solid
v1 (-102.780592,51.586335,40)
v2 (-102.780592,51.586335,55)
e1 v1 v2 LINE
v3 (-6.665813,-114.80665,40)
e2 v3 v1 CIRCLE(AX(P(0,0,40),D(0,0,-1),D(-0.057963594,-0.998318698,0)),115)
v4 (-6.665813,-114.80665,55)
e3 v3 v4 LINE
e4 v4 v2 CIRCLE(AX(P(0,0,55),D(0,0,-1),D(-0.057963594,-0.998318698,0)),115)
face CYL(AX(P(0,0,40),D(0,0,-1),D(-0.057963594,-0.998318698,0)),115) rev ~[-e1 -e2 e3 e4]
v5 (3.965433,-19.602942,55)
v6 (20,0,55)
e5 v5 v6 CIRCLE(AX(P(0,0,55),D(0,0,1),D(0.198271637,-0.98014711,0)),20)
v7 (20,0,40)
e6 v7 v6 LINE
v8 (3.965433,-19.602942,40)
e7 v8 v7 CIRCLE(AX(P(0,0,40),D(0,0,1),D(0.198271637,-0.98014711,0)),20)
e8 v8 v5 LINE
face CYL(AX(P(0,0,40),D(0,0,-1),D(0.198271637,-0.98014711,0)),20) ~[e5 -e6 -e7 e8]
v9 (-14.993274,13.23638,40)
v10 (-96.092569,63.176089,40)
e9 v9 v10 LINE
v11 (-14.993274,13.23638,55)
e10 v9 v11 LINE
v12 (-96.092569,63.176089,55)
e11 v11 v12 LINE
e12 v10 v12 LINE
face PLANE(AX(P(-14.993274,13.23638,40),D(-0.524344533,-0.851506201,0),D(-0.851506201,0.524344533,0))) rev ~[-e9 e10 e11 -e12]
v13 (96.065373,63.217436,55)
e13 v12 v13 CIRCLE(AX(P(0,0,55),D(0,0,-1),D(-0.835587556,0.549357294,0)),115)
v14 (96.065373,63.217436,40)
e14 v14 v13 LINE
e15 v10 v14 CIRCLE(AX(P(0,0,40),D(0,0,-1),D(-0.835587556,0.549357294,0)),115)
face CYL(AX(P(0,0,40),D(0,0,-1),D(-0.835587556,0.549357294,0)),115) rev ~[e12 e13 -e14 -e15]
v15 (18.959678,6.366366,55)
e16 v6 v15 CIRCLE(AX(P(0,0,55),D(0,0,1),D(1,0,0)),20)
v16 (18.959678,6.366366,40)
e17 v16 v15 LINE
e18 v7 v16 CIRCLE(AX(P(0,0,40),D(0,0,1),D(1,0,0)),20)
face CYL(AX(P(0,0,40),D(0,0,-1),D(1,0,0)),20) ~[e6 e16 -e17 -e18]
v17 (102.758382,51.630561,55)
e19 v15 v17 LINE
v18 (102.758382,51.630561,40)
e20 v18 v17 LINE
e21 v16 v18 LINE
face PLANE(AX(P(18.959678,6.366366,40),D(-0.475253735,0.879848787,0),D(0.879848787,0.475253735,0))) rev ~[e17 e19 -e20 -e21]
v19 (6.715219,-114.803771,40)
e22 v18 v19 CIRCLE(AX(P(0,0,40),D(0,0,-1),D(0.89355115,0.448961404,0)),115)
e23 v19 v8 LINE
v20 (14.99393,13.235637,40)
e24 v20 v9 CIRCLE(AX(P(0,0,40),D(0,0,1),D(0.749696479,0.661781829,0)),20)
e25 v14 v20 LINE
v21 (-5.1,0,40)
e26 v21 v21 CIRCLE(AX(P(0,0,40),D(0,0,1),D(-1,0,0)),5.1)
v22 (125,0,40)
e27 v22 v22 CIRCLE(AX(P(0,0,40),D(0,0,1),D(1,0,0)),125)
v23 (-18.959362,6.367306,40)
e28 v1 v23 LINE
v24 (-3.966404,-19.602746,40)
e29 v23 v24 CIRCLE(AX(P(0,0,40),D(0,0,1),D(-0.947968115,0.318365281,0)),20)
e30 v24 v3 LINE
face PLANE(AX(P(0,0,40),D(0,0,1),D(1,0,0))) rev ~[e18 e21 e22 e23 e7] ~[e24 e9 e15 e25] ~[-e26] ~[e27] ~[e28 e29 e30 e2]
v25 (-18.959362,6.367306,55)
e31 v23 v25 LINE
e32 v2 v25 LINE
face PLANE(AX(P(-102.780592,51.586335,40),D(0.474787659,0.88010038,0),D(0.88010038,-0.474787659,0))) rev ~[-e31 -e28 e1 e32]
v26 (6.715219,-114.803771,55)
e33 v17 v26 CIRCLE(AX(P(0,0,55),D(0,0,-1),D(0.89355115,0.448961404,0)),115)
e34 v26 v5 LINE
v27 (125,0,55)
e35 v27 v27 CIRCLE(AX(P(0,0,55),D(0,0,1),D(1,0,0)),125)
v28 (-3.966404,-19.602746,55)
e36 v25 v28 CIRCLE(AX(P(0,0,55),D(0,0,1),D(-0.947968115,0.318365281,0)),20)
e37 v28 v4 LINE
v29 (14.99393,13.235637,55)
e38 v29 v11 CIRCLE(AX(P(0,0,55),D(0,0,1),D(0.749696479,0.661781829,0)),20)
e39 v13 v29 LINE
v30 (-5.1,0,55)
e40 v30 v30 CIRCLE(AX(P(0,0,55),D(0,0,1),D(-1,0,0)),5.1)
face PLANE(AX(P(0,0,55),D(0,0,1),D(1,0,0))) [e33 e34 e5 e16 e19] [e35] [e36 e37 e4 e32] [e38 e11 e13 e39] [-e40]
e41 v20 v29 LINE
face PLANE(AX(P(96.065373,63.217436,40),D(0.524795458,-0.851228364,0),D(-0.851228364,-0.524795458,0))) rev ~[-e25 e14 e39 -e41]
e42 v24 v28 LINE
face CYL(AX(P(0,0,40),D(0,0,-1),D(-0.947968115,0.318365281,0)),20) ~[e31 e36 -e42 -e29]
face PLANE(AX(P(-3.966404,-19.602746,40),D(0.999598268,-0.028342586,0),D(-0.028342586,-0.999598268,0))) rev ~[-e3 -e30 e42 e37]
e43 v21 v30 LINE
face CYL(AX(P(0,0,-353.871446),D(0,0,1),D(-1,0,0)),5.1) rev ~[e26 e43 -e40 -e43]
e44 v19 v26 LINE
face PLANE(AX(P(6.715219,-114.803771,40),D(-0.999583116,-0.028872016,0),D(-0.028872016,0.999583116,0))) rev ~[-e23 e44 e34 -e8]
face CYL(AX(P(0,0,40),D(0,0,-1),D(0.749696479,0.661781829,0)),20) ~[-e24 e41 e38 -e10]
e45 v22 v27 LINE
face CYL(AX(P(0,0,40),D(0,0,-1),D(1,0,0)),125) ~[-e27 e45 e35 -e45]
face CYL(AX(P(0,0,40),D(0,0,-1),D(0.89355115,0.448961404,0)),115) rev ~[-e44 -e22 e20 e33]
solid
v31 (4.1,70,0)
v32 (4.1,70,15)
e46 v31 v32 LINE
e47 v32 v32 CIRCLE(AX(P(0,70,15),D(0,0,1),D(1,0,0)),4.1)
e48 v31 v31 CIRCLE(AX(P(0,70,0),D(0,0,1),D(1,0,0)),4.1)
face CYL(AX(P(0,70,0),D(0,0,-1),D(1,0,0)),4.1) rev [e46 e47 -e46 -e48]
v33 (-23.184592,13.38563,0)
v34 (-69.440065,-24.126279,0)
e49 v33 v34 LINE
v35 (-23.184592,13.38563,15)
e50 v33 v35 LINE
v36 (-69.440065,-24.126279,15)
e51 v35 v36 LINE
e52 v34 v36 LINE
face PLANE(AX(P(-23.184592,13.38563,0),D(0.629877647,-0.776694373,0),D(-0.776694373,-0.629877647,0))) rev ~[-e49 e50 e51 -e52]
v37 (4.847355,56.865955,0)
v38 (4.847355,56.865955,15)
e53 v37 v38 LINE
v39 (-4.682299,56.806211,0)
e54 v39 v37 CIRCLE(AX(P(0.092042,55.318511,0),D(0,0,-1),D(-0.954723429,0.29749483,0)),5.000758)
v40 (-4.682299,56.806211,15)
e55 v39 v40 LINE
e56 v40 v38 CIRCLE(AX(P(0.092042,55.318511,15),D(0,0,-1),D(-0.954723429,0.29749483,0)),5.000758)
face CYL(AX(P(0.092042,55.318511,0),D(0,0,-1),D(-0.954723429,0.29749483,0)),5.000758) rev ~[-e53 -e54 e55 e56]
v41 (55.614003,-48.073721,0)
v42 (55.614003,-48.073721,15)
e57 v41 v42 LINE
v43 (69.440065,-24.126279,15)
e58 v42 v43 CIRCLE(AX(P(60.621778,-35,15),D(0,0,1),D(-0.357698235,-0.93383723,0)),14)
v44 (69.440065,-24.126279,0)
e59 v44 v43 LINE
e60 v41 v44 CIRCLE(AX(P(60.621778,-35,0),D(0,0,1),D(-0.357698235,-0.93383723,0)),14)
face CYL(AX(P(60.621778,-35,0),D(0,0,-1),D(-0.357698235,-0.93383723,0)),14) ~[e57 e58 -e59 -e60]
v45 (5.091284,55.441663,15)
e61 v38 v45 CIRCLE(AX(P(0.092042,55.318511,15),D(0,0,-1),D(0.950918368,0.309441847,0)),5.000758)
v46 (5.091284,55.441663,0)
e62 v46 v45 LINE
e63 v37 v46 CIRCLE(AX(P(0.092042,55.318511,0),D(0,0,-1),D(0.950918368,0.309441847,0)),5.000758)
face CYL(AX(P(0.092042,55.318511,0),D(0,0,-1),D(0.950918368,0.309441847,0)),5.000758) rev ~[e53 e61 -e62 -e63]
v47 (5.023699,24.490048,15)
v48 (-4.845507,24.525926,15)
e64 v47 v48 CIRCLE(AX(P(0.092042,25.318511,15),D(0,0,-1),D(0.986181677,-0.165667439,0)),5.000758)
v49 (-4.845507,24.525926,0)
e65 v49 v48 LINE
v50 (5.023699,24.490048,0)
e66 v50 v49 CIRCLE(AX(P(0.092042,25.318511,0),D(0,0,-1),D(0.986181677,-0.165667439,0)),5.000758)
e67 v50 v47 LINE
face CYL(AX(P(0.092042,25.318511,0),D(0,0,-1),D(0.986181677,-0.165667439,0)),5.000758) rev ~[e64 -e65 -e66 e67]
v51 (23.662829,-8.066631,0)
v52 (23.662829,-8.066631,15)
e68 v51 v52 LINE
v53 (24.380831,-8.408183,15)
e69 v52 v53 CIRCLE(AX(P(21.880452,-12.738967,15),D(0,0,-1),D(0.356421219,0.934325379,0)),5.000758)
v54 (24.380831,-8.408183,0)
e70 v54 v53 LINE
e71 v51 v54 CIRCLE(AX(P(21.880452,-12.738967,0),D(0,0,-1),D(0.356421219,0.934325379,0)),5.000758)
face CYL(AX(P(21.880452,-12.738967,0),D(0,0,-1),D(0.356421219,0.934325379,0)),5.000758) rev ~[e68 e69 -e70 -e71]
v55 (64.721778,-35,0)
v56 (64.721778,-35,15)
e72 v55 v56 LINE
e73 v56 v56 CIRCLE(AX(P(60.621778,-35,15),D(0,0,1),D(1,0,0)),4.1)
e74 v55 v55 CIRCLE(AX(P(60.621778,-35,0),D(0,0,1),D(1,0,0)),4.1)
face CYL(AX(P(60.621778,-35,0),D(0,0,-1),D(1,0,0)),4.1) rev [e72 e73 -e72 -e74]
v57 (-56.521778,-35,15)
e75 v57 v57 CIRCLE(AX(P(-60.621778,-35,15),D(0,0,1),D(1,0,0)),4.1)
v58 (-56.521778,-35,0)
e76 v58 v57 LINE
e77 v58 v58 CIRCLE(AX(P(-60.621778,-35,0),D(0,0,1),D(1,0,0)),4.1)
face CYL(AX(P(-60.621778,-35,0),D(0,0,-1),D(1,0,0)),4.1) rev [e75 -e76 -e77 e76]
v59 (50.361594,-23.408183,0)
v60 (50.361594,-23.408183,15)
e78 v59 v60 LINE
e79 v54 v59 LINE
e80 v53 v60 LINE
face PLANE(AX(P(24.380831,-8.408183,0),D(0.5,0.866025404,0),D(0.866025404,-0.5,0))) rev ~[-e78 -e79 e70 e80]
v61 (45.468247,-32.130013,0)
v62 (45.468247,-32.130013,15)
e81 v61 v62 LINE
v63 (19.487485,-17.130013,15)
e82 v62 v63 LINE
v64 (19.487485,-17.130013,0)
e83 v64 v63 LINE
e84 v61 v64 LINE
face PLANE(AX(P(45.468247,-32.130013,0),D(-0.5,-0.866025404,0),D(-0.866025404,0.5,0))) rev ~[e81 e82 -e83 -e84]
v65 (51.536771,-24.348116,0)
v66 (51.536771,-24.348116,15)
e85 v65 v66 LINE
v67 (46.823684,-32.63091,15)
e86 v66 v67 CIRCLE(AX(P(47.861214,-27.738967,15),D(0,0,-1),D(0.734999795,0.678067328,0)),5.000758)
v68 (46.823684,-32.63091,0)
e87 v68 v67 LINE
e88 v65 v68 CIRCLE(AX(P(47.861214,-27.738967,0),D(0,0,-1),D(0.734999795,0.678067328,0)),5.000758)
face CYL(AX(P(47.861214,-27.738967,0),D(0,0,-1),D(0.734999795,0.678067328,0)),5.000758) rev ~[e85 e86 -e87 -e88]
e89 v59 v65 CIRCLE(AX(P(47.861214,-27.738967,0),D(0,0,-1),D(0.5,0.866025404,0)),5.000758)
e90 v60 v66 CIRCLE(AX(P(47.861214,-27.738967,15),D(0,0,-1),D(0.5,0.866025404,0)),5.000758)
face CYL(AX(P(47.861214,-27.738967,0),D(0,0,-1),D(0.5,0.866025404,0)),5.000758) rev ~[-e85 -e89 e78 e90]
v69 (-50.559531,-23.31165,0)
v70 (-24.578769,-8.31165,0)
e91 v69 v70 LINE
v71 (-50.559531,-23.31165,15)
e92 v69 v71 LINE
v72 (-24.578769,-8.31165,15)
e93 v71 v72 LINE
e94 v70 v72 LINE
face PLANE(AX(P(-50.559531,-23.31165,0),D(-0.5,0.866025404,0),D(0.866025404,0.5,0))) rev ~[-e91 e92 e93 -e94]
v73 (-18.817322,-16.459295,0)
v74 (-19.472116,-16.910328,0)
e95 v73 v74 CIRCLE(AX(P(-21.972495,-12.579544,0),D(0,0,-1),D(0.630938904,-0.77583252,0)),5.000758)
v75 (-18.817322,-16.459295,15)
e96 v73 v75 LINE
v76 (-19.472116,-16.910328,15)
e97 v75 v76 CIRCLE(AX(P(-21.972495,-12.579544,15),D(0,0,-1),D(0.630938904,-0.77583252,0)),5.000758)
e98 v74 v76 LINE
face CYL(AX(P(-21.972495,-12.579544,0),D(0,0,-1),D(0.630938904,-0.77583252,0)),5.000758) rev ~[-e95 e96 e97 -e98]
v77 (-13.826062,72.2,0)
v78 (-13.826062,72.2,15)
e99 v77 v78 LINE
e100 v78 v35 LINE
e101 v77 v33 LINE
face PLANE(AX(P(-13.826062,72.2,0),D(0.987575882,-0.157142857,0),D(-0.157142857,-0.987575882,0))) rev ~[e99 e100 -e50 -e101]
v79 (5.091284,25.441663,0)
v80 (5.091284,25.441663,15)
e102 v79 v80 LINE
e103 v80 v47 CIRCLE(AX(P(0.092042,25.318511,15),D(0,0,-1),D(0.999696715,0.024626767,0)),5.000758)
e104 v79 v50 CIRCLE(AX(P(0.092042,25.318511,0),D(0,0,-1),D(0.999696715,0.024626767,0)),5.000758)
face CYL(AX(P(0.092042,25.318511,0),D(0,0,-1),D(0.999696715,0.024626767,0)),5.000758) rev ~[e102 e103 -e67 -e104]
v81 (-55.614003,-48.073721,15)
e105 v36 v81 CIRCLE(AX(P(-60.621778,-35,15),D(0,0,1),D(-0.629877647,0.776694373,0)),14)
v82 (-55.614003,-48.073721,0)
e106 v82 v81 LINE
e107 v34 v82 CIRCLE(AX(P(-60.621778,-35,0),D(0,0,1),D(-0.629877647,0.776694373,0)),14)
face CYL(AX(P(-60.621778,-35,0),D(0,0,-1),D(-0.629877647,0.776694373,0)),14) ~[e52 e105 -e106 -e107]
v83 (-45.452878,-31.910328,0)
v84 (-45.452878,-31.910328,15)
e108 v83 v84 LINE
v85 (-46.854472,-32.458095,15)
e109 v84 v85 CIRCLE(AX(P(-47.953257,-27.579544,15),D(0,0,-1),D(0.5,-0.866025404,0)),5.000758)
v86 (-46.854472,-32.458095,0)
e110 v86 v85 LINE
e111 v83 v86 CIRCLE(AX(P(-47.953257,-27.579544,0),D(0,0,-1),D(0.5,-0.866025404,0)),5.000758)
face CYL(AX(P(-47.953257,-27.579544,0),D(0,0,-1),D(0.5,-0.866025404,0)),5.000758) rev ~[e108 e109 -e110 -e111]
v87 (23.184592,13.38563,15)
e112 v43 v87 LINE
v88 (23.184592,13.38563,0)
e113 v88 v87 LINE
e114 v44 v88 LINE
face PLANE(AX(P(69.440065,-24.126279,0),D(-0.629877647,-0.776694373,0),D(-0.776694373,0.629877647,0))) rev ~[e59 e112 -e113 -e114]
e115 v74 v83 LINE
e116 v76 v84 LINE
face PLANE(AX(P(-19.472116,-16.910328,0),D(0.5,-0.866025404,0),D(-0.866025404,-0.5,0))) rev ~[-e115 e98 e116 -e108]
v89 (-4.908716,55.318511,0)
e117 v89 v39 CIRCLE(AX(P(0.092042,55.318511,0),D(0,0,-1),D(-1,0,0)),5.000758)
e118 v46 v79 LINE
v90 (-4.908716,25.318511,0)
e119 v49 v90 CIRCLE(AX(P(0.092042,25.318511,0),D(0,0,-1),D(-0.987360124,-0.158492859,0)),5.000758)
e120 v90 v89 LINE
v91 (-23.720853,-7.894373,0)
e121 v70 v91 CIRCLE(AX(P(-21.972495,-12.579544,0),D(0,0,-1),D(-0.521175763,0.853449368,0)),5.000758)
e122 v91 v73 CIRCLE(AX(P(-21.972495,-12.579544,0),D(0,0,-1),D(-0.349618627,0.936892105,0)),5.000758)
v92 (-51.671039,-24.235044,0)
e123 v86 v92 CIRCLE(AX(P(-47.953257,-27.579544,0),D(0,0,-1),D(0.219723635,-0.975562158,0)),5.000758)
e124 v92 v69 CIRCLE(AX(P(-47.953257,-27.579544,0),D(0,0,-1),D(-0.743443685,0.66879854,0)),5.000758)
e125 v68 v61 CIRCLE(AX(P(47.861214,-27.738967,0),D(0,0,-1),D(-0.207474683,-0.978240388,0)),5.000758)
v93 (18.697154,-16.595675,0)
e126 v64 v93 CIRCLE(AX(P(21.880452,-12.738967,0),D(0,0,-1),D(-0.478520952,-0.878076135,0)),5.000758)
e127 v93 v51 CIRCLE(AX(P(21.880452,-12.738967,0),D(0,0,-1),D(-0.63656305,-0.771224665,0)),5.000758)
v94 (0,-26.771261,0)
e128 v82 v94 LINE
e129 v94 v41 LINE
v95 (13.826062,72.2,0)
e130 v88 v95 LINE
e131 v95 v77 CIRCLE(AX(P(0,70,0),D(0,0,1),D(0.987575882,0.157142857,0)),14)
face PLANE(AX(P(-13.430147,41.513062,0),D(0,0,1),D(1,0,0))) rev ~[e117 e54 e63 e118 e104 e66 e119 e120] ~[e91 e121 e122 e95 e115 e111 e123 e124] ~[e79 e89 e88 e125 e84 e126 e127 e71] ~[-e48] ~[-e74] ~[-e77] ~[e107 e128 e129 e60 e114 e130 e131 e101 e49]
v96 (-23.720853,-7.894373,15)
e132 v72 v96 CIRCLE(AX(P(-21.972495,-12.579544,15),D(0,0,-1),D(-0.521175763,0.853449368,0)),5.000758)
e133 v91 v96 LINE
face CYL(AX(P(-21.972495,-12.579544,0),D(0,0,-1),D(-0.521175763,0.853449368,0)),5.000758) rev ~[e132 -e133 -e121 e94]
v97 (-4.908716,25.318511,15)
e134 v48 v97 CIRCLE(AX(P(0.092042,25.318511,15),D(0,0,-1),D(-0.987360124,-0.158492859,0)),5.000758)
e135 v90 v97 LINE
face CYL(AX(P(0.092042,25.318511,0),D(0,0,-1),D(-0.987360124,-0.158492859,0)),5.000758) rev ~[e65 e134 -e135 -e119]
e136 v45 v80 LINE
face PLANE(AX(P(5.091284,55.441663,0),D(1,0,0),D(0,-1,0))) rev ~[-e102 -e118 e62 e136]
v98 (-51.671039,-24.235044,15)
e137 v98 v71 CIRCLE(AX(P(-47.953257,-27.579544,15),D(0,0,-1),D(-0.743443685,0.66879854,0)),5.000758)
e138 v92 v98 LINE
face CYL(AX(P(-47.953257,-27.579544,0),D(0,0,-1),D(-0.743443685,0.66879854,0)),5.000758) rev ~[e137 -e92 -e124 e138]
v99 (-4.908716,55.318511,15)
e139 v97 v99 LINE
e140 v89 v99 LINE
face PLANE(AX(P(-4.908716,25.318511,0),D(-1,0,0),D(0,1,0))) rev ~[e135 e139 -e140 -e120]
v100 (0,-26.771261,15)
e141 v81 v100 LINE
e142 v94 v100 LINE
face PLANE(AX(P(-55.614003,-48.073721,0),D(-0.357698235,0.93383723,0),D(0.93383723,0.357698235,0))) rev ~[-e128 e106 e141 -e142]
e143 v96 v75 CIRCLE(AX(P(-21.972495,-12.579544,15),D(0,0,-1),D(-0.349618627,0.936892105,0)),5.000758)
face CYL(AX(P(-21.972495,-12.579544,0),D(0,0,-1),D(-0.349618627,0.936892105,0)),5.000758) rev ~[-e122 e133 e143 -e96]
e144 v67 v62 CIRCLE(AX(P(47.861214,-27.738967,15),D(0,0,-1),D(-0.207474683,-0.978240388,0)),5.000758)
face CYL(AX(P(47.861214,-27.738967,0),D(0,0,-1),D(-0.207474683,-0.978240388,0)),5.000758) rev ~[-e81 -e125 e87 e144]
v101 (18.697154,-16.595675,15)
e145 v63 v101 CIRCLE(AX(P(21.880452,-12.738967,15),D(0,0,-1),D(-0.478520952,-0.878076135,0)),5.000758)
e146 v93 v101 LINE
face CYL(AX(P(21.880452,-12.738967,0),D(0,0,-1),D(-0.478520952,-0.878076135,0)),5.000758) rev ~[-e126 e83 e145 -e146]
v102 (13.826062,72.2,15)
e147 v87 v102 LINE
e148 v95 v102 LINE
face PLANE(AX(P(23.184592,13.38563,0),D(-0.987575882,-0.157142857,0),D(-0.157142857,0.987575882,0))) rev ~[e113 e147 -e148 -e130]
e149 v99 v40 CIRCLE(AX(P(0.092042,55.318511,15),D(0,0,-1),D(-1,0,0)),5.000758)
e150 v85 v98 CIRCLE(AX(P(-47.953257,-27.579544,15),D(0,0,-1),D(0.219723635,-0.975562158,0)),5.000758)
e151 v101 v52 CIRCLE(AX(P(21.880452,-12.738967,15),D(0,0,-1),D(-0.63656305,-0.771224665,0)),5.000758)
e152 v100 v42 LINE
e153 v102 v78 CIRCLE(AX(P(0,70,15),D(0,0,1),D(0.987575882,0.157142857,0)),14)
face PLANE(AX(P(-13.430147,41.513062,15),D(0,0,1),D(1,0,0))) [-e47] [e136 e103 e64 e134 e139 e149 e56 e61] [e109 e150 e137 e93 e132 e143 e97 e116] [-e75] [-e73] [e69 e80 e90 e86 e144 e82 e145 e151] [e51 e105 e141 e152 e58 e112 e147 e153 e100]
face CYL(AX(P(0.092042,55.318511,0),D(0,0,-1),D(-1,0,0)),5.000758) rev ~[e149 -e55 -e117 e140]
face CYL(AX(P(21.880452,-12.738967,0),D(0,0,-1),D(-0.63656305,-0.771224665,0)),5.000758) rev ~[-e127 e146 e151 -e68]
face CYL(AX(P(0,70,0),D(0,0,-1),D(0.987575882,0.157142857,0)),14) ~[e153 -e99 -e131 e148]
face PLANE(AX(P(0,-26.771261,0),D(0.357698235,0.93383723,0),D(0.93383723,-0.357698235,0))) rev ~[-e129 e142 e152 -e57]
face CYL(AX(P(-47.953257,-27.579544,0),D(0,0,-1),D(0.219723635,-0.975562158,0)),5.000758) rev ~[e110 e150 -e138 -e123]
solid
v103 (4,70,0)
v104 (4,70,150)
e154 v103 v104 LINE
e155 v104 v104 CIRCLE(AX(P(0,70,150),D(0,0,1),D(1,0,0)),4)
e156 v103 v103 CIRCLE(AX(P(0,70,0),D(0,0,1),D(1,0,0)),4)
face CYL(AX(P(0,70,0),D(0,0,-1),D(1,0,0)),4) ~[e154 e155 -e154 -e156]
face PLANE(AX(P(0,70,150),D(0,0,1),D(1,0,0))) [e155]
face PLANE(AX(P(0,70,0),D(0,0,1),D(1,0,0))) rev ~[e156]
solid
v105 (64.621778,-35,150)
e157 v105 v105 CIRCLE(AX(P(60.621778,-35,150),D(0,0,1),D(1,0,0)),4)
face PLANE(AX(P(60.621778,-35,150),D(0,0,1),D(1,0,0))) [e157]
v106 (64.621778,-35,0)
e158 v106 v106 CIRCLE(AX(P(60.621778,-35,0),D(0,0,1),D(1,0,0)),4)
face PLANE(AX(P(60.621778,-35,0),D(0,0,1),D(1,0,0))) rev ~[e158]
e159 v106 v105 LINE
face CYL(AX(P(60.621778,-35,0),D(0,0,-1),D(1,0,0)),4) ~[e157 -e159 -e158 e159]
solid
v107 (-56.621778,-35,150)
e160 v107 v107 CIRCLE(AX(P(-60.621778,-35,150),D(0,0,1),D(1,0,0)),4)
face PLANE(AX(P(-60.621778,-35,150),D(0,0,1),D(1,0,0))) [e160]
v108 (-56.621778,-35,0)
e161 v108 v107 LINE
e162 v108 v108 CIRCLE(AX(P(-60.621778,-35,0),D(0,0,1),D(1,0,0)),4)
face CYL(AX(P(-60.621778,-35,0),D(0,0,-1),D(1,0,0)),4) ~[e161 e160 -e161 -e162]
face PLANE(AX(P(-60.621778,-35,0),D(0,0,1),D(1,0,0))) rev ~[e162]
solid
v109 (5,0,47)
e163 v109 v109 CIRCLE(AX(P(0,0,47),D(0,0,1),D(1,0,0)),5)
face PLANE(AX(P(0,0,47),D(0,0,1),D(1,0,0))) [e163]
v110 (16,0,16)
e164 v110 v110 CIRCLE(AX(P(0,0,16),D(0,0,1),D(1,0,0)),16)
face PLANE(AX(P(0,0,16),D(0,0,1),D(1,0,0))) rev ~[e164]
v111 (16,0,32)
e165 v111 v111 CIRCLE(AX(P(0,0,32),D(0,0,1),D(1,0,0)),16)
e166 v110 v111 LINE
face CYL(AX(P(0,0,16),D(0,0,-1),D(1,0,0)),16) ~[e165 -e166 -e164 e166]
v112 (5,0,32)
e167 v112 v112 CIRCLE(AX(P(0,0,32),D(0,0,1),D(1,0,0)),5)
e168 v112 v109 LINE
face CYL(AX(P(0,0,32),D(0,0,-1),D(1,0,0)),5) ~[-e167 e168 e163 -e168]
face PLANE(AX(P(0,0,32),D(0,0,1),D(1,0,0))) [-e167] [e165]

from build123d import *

# Parameters (mm, degrees)
F0_R      = 4
F1_DEPTH  = 150
F2_R      = 4.1
F3_DEPTH  = 15
F5_R      = 125
F6_DEPTH  = 15
F7_D      = 10.2
F9_R      = 16
F10_DEPTH = 16
F11_R     = 5
F12_DEPTH = 15


# Not quite as in the source:
# - a feature names something its author has since deleted; it is built from what else it names


with BuildPart() as f1:
    # F0 (on Top) → F1 (new body)
    with BuildSketch(Plane.XY):
        with Locations((0, 70)):
            Circle(F0_R)
    extrude(amount=F1_DEPTH)


with BuildPart() as f1b:
    # F0 (on Top) → F1, piece 2 (new body)
    with BuildSketch(Plane.XY):
        with Locations((-60.6217782649, -35)):
            Circle(F0_R)
    extrude(amount=F1_DEPTH)


with BuildPart() as f1c:
    # F0 (on Top) → F1, piece 3 (new body)
    with BuildSketch(Plane.XY):
        with Locations((60.6217782649, -35)):
            Circle(F0_R)
    extrude(amount=F1_DEPTH)


with BuildPart() as f3:
    # F2 (on Top) → F3 (new body)
    with BuildSketch(Plane.XY):
        with BuildLine():
            ThreePointArc((-15.7469411811, 19.4173593323), (-10.6083266094, 22.6376546168), (-4.8455068732, 24.5259263462))
            ThreePointArc((-4.8455068732, 24.5259263462), (-4.8928885521, 24.9209603499), (-4.9087158404, 25.3185108304))
            Line((-4.9087158404, 25.3185108304), (-4.9087158404, 55.3185108304))
            ThreePointArc((-4.9087158404, 55.3185108304), (-4.851787509, 56.0709261545), (-4.6822986521, 56.8062105772))
            ThreePointArc((-4.6822986521, 56.8062105772), (-12.0366957637, 62.8503178328), (-13.8260623462, 72.2))
            Line((-13.8260623462, 72.2), (-23.1845919064, 13.3856303782))
            Line((-23.1845919064, 13.3856303782), (-15.7469411811, 19.4173593323))
        make_face()
        with BuildLine():
            ThreePointArc((14, 70), (13.956447844, 71.1034326336), (13.8260623462, 72.2))
            ThreePointArc((13.8260623462, 72.2), (0, 84), (-13.8260623462, 72.2))
            ThreePointArc((-13.8260623462, 72.2), (-12.0366957637, 62.8503178328), (-4.6822986521, 56.8062105772))
            ThreePointArc((-4.6822986521, 56.8062105772), (0.0606919076, 60.3191708855), (4.8473554351, 56.865954725))
            ThreePointArc((4.8473554351, 56.865954725), (11.486143306, 61.9957191482), (14, 70))
        make_face()
        with Locations((0, 70)):
            Circle(F2_R, mode=Mode.SUBTRACT)
        with BuildLine():
            ThreePointArc((5.0236987184, 24.4900480029), (10.6905525136, 22.598939952), (15.7469411811, 19.4173593323))
            Line((15.7469411811, 19.4173593323), (23.1845919064, 13.3856303782))
            Line((23.1845919064, 13.3856303782), (13.8260623462, 72.2))
            ThreePointArc((13.8260623462, 72.2), (13.956447844, 71.1034326336), (14, 70))
            ThreePointArc((14, 70), (11.486143306, 61.9957191482), (4.8473554351, 56.865954725))
            ThreePointArc((4.8473554351, 56.865954725), (5.0210368519, 56.1626662615), (5.0912841596, 55.4416633397))
            Line((5.0912841596, 55.4416633397), (5.0912841596, 25.4416633397))
            ThreePointArc((5.0912841596, 25.4416633397), (5.0802361713, 24.9642402993), (5.0236987184, 24.4900480029))
        make_face()
        with BuildLine():
            ThreePointArc((23.6628287038, -8.0666311267), (24.6634417468, -4.0883543391), (25, 0))
            ThreePointArc((25, 0), (24.9222282929, 1.9704154171), (24.6893970467, 3.9285714286))
            ThreePointArc((24.6893970467, 3.9285714286), (21.6506350946, 12.5), (15.7469411811, 19.4173593323))
            ThreePointArc((15.7469411811, 19.4173593323), (10.6905525136, 22.598939952), (5.0236987184, 24.4900480029))
            ThreePointArc((5.0236987184, 24.4900480029), (0.0738629344, 20.3177855481), (-4.8455068732, 24.5259263462))
            ThreePointArc((-4.8455068732, 24.5259263462), (-10.6083266094, 22.6376546168), (-15.7469411811, 19.4173593323))
            ThreePointArc((-15.7469411811, 19.4173593323), (-21.6506350946, 12.5), (-24.6893970467, 3.9285714286))
            ThreePointArc((-24.6893970467, 3.9285714286), (-24.9165323538, -2.0411799187), (-23.7208530697, -7.8943732904))
            ThreePointArc((-23.7208530697, -7.8943732904), (-17.6326499005, -10.0949255965), (-18.8173218306, -16.4592952196))
            ThreePointArc((-18.8173218306, -16.4592952196), (-14.3006206755, -20.5059076438), (-8.9424558656, -23.3459307609))
            ThreePointArc((-8.9424558656, -23.3459307609), (0, -25), (8.9424558656, -23.3459307609))
            ThreePointArc((8.9424558656, -23.3459307609), (14.2259798402, -20.5577600333), (18.6971543512, -16.5956747126))
            ThreePointArc((18.6971543512, -16.5956747126), (17.5587869661, -10.2228599516), (23.6628287038, -8.0666311267))
        make_face()
        with BuildLine():
            Line((-24.6893970467, 3.9285714286), (-23.1845919064, 13.3856303782))
            Line((-23.1845919064, 13.3856303782), (-69.4400653263, -24.1262787739))
            ThreePointArc((-69.4400653263, -24.1262787739), (-60.5360847426, -21.000262266), (-51.6710391199, -24.2350444145))
            ThreePointArc((-51.6710391199, -24.2350444145), (-51.1488141527, -23.7329876636), (-50.5595309601, -23.3116502498))
            Line((-50.5595309601, -23.3116502498), (-24.5787688465, -8.3116502498))
            ThreePointArc((-24.5787688465, -8.3116502498), (-24.1597843711, -8.0825065681), (-23.7208530697, -7.8943732904))
            ThreePointArc((-23.7208530697, -7.8943732904), (-24.9165323538, -2.0411799187), (-24.6893970467, 3.9285714286))
        make_face()
        with BuildLine():
            ThreePointArc((-69.4400653263, -24.1262787739), (-72.7461339179, -42), (-55.6140029802, -48.0737212261))
            ThreePointArc((-55.6140029802, -48.0737212261), (-49.0868562022, -42.9338246141), (-46.6217782649, -35))
            ThreePointArc((-46.6217782649, -35), (-46.6800730977, -33.723733166), (-46.8544721266, -32.4580948694))
            ThreePointArc((-46.8544721266, -32.4580948694), (-52.2682802758, -30.107024709), (-51.6710391199, -24.2350444145))
            ThreePointArc((-51.6710391199, -24.2350444145), (-60.5360847426, -21.000262266), (-69.4400653263, -24.1262787739))
        make_face()
        with Locations((-60.6217782649, -35)):
            Circle(F2_R, mode=Mode.SUBTRACT)
        with BuildLine():
            Line((0, -26.7712607564), (-8.9424558656, -23.3459307609))
            ThreePointArc((-8.9424558656, -23.3459307609), (-14.3006206755, -20.5059076438), (-18.8173218306, -16.4592952196))
            ThreePointArc((-18.8173218306, -16.4592952196), (-19.1357404737, -16.697845959), (-19.4721156449, -16.910328033))
            Line((-19.4721156449, -16.910328033), (-45.4528777584, -31.910328033))
            ThreePointArc((-45.4528777584, -31.910328033), (-46.132952709, -32.2372343138), (-46.8544721266, -32.4580948694))
            ThreePointArc((-46.8544721266, -32.4580948694), (-46.6800730977, -33.723733166), (-46.6217782649, -35))
            ThreePointArc((-46.6217782649, -35), (-49.0868562022, -42.9338246141), (-55.6140029802, -48.0737212261))
            Line((-55.6140029802, -48.0737212261), (0, -26.7712607564))
        make_face()
        with BuildLine():
            ThreePointArc((19.487484687, -17.1300130899), (19.0795481998, -16.8817337312), (18.6971543512, -16.5956747126))
            ThreePointArc((18.6971543512, -16.5956747126), (14.2259798402, -20.5577600333), (8.9424558656, -23.3459307609))
            Line((8.9424558656, -23.3459307609), (0, -26.7712607564))
            Line((0, -26.7712607564), (55.6140029802, -48.0737212261))
            ThreePointArc((55.6140029802, -48.0737212261), (48.4548029798, -41.9256560998), (46.8236836847, -32.6309103105))
            ThreePointArc((46.8236836847, -32.6309103105), (46.1277773008, -32.4296785979), (45.4682468005, -32.1300130899))
            Line((45.4682468005, -32.1300130899), (19.487484687, -17.1300130899))
        make_face()
        with BuildLine():
            ThreePointArc((24.6893970467, 3.9285714286), (24.9222282929, 1.9704154171), (25, 0))
            ThreePointArc((25, 0), (24.6634417468, -4.0883543391), (23.6628287038, -8.0666311267))
            ThreePointArc((23.6628287038, -8.0666311267), (24.0286290258, -8.2231143909), (24.3808314853, -8.4081827974))
            Line((24.3808314853, -8.4081827974), (50.3615935989, -23.4081827974))
            ThreePointArc((50.3615935989, -23.4081827974), (50.984740218, -23.8336918407), (51.5367707787, -24.3481157078))
            ThreePointArc((51.5367707787, -24.3481157078), (60.448319761, -21.0010746074), (69.4400653263, -24.1262787739))
            Line((69.4400653263, -24.1262787739), (23.1845919064, 13.3856303782))
            Line((23.1845919064, 13.3856303782), (24.6893970467, 3.9285714286))
        make_face()
        with BuildLine():
            ThreePointArc((74.6217782649, -35), (73.2601329612, -28.97737677), (69.4400653263, -24.1262787739))
            ThreePointArc((69.4400653263, -24.1262787739), (60.448319761, -21.0010746074), (51.5367707787, -24.3481157078))
            ThreePointArc((51.5367707787, -24.3481157078), (52.2075883683, -30.2121461765), (46.8236836847, -32.6309103105))
            ThreePointArc((46.8236836847, -32.6309103105), (48.4548029798, -41.9256560998), (55.6140029802, -48.0737212261))
            ThreePointArc((55.6140029802, -48.0737212261), (68.555602879, -46.5349220627), (74.6217782649, -35))
        make_face()
        with Locations((60.6217782649, -35)):
            Circle(F2_R, mode=Mode.SUBTRACT)
        with BuildLine():
            ThreePointArc((15.7469411811, 19.4173593323), (21.6506350946, 12.5), (24.6893970467, 3.9285714286))
            Line((24.6893970467, 3.9285714286), (23.1845919064, 13.3856303782))
            Line((23.1845919064, 13.3856303782), (15.7469411811, 19.4173593323))
        make_face()
        with BuildLine():
            ThreePointArc((-24.6893970467, 3.9285714286), (-21.6506350946, 12.5), (-15.7469411811, 19.4173593323))
            Line((-15.7469411811, 19.4173593323), (-23.1845919064, 13.3856303782))
            Line((-23.1845919064, 13.3856303782), (-24.6893970467, 3.9285714286))
        make_face()
        with BuildLine():
            Line((0, -26.7712607564), (8.9424558656, -23.3459307609))
            ThreePointArc((8.9424558656, -23.3459307609), (0, -25), (-8.9424558656, -23.3459307609))
            Line((-8.9424558656, -23.3459307609), (0, -26.7712607564))
        make_face()
    extrude(amount=F3_DEPTH)


with BuildPart() as f6:
    # F5 (on offset) → F6 (new body)
    with BuildSketch(Plane.XY.offset(40)):
        Circle(F5_R)
        with BuildLine():
            ThreePointArc((102.7583822566, 51.6305614534), (111.8977523445, 26.5309822706), (115, 0))
            ThreePointArc((115, 0), (83.6577855811, -78.9073818579), (6.7152189274, -114.8037709954))
            ThreePointArc((6.7152189274, -114.8037709954), (0.0247447273, -114.9999973378), (-6.665813298, -114.8066502128))
            ThreePointArc((-6.665813298, -114.8066502128), (-99.5805467661, -57.5214282313), (-102.7805915959, 51.5863353146))
            ThreePointArc((-102.7805915959, 51.5863353146), (-99.6052914933, 57.4785691065), (-96.0925689586, 63.1760887593))
            ThreePointArc((-96.0925689586, 63.1760887593), (-0.0247447273, 114.9999973378), (96.0653726685, 63.2174356808))
            ThreePointArc((96.0653726685, 63.2174356808), (99.5805467661, 57.5214282313), (102.7583822566, 51.6305614534))
        make_face(mode=Mode.SUBTRACT)
        with BuildLine():
            Line((-14.9932737383, 13.2363795129), (-96.0925689586, 63.1760887593))
            ThreePointArc((-96.0925689586, 63.1760887593), (-99.6052914933, 57.4785691065), (-102.7805915959, 51.5863353146))
            Line((-102.7805915959, 51.5863353146), (-18.9593623085, 6.3673056198))
            ThreePointArc((-18.9593623085, 6.3673056198), (-17.3202603233, 10.0004291074), (-14.9932737383, 13.2363795129))
        make_face()
        with BuildLine():
            Line((18.9596777814, 6.3663661868), (102.7583822566, 51.6305614534))
            ThreePointArc((102.7583822566, 51.6305614534), (99.5805467661, 57.5214282313), (96.0653726685, 63.2174356808))
            Line((96.0653726685, 63.2174356808), (14.9939295747, 13.2356365888))
            ThreePointArc((14.9939295747, 13.2356365888), (17.3207558174, 9.9995708864), (18.9596777814, 6.3663661868))
        make_face()
        with BuildLine():
            ThreePointArc((-6.665813298, -114.8066502128), (0.0247447273, -114.9999973378), (6.7152189274, -114.8037709954))
            Line((6.7152189274, -114.8037709954), (3.9654327338, -19.6029422086))
            ThreePointArc((3.9654327338, -19.6029422086), (-0.0004954941, -19.9999999939), (-3.9664040432, -19.6027456997))
            Line((-3.9664040432, -19.6027456997), (-6.665813298, -114.8066502128))
        make_face()
        with BuildLine():
            ThreePointArc((20, 0), (19.7382060435, 3.2254026393), (18.9596777814, 6.3663661868))
            ThreePointArc((18.9596777814, 6.3663661868), (17.3207558174, 9.9995708864), (14.9939295747, 13.2356365888))
            ThreePointArc((14.9939295747, 13.2356365888), (0.0004954941, 19.9999999939), (-14.9932737383, 13.2363795129))
            ThreePointArc((-14.9932737383, 13.2363795129), (-17.3202603233, 10.0004291074), (-18.9593623085, 6.3673056198))
            ThreePointArc((-18.9593623085, 6.3673056198), (-17.3207558174, -9.9995708864), (-3.9664040432, -19.6027456997))
            ThreePointArc((-3.9664040432, -19.6027456997), (-0.0004954941, -19.9999999939), (3.9654327338, -19.6029422086))
            ThreePointArc((3.9654327338, -19.6029422086), (15.4807728275, -12.6627671803), (20, 0))
        make_face()
    extrude(amount=F6_DEPTH)

    # F7 (through all)
    with Locations(Plane(origin=(0, 0, 0), x_dir=(1, 0, 0), z_dir=(0, 0, -1))):
        with Locations((0, 0)):
            Hole(F7_D / 2)


with BuildPart() as f10:
    # F9 (on offset) → F10 (new body)
    with BuildSketch(Plane.XY.offset(16)):
        Circle(F9_R)
    extrude(amount=F10_DEPTH)

    # F11 (on face) → F12 (join)
    with BuildSketch(Plane.XY.offset(32)):
        Circle(F11_R)
    extrude(amount=F12_DEPTH)


solid = Compound([f1.part, f1b.part, f1c.part, f3.part, f6.part, f10.part])
